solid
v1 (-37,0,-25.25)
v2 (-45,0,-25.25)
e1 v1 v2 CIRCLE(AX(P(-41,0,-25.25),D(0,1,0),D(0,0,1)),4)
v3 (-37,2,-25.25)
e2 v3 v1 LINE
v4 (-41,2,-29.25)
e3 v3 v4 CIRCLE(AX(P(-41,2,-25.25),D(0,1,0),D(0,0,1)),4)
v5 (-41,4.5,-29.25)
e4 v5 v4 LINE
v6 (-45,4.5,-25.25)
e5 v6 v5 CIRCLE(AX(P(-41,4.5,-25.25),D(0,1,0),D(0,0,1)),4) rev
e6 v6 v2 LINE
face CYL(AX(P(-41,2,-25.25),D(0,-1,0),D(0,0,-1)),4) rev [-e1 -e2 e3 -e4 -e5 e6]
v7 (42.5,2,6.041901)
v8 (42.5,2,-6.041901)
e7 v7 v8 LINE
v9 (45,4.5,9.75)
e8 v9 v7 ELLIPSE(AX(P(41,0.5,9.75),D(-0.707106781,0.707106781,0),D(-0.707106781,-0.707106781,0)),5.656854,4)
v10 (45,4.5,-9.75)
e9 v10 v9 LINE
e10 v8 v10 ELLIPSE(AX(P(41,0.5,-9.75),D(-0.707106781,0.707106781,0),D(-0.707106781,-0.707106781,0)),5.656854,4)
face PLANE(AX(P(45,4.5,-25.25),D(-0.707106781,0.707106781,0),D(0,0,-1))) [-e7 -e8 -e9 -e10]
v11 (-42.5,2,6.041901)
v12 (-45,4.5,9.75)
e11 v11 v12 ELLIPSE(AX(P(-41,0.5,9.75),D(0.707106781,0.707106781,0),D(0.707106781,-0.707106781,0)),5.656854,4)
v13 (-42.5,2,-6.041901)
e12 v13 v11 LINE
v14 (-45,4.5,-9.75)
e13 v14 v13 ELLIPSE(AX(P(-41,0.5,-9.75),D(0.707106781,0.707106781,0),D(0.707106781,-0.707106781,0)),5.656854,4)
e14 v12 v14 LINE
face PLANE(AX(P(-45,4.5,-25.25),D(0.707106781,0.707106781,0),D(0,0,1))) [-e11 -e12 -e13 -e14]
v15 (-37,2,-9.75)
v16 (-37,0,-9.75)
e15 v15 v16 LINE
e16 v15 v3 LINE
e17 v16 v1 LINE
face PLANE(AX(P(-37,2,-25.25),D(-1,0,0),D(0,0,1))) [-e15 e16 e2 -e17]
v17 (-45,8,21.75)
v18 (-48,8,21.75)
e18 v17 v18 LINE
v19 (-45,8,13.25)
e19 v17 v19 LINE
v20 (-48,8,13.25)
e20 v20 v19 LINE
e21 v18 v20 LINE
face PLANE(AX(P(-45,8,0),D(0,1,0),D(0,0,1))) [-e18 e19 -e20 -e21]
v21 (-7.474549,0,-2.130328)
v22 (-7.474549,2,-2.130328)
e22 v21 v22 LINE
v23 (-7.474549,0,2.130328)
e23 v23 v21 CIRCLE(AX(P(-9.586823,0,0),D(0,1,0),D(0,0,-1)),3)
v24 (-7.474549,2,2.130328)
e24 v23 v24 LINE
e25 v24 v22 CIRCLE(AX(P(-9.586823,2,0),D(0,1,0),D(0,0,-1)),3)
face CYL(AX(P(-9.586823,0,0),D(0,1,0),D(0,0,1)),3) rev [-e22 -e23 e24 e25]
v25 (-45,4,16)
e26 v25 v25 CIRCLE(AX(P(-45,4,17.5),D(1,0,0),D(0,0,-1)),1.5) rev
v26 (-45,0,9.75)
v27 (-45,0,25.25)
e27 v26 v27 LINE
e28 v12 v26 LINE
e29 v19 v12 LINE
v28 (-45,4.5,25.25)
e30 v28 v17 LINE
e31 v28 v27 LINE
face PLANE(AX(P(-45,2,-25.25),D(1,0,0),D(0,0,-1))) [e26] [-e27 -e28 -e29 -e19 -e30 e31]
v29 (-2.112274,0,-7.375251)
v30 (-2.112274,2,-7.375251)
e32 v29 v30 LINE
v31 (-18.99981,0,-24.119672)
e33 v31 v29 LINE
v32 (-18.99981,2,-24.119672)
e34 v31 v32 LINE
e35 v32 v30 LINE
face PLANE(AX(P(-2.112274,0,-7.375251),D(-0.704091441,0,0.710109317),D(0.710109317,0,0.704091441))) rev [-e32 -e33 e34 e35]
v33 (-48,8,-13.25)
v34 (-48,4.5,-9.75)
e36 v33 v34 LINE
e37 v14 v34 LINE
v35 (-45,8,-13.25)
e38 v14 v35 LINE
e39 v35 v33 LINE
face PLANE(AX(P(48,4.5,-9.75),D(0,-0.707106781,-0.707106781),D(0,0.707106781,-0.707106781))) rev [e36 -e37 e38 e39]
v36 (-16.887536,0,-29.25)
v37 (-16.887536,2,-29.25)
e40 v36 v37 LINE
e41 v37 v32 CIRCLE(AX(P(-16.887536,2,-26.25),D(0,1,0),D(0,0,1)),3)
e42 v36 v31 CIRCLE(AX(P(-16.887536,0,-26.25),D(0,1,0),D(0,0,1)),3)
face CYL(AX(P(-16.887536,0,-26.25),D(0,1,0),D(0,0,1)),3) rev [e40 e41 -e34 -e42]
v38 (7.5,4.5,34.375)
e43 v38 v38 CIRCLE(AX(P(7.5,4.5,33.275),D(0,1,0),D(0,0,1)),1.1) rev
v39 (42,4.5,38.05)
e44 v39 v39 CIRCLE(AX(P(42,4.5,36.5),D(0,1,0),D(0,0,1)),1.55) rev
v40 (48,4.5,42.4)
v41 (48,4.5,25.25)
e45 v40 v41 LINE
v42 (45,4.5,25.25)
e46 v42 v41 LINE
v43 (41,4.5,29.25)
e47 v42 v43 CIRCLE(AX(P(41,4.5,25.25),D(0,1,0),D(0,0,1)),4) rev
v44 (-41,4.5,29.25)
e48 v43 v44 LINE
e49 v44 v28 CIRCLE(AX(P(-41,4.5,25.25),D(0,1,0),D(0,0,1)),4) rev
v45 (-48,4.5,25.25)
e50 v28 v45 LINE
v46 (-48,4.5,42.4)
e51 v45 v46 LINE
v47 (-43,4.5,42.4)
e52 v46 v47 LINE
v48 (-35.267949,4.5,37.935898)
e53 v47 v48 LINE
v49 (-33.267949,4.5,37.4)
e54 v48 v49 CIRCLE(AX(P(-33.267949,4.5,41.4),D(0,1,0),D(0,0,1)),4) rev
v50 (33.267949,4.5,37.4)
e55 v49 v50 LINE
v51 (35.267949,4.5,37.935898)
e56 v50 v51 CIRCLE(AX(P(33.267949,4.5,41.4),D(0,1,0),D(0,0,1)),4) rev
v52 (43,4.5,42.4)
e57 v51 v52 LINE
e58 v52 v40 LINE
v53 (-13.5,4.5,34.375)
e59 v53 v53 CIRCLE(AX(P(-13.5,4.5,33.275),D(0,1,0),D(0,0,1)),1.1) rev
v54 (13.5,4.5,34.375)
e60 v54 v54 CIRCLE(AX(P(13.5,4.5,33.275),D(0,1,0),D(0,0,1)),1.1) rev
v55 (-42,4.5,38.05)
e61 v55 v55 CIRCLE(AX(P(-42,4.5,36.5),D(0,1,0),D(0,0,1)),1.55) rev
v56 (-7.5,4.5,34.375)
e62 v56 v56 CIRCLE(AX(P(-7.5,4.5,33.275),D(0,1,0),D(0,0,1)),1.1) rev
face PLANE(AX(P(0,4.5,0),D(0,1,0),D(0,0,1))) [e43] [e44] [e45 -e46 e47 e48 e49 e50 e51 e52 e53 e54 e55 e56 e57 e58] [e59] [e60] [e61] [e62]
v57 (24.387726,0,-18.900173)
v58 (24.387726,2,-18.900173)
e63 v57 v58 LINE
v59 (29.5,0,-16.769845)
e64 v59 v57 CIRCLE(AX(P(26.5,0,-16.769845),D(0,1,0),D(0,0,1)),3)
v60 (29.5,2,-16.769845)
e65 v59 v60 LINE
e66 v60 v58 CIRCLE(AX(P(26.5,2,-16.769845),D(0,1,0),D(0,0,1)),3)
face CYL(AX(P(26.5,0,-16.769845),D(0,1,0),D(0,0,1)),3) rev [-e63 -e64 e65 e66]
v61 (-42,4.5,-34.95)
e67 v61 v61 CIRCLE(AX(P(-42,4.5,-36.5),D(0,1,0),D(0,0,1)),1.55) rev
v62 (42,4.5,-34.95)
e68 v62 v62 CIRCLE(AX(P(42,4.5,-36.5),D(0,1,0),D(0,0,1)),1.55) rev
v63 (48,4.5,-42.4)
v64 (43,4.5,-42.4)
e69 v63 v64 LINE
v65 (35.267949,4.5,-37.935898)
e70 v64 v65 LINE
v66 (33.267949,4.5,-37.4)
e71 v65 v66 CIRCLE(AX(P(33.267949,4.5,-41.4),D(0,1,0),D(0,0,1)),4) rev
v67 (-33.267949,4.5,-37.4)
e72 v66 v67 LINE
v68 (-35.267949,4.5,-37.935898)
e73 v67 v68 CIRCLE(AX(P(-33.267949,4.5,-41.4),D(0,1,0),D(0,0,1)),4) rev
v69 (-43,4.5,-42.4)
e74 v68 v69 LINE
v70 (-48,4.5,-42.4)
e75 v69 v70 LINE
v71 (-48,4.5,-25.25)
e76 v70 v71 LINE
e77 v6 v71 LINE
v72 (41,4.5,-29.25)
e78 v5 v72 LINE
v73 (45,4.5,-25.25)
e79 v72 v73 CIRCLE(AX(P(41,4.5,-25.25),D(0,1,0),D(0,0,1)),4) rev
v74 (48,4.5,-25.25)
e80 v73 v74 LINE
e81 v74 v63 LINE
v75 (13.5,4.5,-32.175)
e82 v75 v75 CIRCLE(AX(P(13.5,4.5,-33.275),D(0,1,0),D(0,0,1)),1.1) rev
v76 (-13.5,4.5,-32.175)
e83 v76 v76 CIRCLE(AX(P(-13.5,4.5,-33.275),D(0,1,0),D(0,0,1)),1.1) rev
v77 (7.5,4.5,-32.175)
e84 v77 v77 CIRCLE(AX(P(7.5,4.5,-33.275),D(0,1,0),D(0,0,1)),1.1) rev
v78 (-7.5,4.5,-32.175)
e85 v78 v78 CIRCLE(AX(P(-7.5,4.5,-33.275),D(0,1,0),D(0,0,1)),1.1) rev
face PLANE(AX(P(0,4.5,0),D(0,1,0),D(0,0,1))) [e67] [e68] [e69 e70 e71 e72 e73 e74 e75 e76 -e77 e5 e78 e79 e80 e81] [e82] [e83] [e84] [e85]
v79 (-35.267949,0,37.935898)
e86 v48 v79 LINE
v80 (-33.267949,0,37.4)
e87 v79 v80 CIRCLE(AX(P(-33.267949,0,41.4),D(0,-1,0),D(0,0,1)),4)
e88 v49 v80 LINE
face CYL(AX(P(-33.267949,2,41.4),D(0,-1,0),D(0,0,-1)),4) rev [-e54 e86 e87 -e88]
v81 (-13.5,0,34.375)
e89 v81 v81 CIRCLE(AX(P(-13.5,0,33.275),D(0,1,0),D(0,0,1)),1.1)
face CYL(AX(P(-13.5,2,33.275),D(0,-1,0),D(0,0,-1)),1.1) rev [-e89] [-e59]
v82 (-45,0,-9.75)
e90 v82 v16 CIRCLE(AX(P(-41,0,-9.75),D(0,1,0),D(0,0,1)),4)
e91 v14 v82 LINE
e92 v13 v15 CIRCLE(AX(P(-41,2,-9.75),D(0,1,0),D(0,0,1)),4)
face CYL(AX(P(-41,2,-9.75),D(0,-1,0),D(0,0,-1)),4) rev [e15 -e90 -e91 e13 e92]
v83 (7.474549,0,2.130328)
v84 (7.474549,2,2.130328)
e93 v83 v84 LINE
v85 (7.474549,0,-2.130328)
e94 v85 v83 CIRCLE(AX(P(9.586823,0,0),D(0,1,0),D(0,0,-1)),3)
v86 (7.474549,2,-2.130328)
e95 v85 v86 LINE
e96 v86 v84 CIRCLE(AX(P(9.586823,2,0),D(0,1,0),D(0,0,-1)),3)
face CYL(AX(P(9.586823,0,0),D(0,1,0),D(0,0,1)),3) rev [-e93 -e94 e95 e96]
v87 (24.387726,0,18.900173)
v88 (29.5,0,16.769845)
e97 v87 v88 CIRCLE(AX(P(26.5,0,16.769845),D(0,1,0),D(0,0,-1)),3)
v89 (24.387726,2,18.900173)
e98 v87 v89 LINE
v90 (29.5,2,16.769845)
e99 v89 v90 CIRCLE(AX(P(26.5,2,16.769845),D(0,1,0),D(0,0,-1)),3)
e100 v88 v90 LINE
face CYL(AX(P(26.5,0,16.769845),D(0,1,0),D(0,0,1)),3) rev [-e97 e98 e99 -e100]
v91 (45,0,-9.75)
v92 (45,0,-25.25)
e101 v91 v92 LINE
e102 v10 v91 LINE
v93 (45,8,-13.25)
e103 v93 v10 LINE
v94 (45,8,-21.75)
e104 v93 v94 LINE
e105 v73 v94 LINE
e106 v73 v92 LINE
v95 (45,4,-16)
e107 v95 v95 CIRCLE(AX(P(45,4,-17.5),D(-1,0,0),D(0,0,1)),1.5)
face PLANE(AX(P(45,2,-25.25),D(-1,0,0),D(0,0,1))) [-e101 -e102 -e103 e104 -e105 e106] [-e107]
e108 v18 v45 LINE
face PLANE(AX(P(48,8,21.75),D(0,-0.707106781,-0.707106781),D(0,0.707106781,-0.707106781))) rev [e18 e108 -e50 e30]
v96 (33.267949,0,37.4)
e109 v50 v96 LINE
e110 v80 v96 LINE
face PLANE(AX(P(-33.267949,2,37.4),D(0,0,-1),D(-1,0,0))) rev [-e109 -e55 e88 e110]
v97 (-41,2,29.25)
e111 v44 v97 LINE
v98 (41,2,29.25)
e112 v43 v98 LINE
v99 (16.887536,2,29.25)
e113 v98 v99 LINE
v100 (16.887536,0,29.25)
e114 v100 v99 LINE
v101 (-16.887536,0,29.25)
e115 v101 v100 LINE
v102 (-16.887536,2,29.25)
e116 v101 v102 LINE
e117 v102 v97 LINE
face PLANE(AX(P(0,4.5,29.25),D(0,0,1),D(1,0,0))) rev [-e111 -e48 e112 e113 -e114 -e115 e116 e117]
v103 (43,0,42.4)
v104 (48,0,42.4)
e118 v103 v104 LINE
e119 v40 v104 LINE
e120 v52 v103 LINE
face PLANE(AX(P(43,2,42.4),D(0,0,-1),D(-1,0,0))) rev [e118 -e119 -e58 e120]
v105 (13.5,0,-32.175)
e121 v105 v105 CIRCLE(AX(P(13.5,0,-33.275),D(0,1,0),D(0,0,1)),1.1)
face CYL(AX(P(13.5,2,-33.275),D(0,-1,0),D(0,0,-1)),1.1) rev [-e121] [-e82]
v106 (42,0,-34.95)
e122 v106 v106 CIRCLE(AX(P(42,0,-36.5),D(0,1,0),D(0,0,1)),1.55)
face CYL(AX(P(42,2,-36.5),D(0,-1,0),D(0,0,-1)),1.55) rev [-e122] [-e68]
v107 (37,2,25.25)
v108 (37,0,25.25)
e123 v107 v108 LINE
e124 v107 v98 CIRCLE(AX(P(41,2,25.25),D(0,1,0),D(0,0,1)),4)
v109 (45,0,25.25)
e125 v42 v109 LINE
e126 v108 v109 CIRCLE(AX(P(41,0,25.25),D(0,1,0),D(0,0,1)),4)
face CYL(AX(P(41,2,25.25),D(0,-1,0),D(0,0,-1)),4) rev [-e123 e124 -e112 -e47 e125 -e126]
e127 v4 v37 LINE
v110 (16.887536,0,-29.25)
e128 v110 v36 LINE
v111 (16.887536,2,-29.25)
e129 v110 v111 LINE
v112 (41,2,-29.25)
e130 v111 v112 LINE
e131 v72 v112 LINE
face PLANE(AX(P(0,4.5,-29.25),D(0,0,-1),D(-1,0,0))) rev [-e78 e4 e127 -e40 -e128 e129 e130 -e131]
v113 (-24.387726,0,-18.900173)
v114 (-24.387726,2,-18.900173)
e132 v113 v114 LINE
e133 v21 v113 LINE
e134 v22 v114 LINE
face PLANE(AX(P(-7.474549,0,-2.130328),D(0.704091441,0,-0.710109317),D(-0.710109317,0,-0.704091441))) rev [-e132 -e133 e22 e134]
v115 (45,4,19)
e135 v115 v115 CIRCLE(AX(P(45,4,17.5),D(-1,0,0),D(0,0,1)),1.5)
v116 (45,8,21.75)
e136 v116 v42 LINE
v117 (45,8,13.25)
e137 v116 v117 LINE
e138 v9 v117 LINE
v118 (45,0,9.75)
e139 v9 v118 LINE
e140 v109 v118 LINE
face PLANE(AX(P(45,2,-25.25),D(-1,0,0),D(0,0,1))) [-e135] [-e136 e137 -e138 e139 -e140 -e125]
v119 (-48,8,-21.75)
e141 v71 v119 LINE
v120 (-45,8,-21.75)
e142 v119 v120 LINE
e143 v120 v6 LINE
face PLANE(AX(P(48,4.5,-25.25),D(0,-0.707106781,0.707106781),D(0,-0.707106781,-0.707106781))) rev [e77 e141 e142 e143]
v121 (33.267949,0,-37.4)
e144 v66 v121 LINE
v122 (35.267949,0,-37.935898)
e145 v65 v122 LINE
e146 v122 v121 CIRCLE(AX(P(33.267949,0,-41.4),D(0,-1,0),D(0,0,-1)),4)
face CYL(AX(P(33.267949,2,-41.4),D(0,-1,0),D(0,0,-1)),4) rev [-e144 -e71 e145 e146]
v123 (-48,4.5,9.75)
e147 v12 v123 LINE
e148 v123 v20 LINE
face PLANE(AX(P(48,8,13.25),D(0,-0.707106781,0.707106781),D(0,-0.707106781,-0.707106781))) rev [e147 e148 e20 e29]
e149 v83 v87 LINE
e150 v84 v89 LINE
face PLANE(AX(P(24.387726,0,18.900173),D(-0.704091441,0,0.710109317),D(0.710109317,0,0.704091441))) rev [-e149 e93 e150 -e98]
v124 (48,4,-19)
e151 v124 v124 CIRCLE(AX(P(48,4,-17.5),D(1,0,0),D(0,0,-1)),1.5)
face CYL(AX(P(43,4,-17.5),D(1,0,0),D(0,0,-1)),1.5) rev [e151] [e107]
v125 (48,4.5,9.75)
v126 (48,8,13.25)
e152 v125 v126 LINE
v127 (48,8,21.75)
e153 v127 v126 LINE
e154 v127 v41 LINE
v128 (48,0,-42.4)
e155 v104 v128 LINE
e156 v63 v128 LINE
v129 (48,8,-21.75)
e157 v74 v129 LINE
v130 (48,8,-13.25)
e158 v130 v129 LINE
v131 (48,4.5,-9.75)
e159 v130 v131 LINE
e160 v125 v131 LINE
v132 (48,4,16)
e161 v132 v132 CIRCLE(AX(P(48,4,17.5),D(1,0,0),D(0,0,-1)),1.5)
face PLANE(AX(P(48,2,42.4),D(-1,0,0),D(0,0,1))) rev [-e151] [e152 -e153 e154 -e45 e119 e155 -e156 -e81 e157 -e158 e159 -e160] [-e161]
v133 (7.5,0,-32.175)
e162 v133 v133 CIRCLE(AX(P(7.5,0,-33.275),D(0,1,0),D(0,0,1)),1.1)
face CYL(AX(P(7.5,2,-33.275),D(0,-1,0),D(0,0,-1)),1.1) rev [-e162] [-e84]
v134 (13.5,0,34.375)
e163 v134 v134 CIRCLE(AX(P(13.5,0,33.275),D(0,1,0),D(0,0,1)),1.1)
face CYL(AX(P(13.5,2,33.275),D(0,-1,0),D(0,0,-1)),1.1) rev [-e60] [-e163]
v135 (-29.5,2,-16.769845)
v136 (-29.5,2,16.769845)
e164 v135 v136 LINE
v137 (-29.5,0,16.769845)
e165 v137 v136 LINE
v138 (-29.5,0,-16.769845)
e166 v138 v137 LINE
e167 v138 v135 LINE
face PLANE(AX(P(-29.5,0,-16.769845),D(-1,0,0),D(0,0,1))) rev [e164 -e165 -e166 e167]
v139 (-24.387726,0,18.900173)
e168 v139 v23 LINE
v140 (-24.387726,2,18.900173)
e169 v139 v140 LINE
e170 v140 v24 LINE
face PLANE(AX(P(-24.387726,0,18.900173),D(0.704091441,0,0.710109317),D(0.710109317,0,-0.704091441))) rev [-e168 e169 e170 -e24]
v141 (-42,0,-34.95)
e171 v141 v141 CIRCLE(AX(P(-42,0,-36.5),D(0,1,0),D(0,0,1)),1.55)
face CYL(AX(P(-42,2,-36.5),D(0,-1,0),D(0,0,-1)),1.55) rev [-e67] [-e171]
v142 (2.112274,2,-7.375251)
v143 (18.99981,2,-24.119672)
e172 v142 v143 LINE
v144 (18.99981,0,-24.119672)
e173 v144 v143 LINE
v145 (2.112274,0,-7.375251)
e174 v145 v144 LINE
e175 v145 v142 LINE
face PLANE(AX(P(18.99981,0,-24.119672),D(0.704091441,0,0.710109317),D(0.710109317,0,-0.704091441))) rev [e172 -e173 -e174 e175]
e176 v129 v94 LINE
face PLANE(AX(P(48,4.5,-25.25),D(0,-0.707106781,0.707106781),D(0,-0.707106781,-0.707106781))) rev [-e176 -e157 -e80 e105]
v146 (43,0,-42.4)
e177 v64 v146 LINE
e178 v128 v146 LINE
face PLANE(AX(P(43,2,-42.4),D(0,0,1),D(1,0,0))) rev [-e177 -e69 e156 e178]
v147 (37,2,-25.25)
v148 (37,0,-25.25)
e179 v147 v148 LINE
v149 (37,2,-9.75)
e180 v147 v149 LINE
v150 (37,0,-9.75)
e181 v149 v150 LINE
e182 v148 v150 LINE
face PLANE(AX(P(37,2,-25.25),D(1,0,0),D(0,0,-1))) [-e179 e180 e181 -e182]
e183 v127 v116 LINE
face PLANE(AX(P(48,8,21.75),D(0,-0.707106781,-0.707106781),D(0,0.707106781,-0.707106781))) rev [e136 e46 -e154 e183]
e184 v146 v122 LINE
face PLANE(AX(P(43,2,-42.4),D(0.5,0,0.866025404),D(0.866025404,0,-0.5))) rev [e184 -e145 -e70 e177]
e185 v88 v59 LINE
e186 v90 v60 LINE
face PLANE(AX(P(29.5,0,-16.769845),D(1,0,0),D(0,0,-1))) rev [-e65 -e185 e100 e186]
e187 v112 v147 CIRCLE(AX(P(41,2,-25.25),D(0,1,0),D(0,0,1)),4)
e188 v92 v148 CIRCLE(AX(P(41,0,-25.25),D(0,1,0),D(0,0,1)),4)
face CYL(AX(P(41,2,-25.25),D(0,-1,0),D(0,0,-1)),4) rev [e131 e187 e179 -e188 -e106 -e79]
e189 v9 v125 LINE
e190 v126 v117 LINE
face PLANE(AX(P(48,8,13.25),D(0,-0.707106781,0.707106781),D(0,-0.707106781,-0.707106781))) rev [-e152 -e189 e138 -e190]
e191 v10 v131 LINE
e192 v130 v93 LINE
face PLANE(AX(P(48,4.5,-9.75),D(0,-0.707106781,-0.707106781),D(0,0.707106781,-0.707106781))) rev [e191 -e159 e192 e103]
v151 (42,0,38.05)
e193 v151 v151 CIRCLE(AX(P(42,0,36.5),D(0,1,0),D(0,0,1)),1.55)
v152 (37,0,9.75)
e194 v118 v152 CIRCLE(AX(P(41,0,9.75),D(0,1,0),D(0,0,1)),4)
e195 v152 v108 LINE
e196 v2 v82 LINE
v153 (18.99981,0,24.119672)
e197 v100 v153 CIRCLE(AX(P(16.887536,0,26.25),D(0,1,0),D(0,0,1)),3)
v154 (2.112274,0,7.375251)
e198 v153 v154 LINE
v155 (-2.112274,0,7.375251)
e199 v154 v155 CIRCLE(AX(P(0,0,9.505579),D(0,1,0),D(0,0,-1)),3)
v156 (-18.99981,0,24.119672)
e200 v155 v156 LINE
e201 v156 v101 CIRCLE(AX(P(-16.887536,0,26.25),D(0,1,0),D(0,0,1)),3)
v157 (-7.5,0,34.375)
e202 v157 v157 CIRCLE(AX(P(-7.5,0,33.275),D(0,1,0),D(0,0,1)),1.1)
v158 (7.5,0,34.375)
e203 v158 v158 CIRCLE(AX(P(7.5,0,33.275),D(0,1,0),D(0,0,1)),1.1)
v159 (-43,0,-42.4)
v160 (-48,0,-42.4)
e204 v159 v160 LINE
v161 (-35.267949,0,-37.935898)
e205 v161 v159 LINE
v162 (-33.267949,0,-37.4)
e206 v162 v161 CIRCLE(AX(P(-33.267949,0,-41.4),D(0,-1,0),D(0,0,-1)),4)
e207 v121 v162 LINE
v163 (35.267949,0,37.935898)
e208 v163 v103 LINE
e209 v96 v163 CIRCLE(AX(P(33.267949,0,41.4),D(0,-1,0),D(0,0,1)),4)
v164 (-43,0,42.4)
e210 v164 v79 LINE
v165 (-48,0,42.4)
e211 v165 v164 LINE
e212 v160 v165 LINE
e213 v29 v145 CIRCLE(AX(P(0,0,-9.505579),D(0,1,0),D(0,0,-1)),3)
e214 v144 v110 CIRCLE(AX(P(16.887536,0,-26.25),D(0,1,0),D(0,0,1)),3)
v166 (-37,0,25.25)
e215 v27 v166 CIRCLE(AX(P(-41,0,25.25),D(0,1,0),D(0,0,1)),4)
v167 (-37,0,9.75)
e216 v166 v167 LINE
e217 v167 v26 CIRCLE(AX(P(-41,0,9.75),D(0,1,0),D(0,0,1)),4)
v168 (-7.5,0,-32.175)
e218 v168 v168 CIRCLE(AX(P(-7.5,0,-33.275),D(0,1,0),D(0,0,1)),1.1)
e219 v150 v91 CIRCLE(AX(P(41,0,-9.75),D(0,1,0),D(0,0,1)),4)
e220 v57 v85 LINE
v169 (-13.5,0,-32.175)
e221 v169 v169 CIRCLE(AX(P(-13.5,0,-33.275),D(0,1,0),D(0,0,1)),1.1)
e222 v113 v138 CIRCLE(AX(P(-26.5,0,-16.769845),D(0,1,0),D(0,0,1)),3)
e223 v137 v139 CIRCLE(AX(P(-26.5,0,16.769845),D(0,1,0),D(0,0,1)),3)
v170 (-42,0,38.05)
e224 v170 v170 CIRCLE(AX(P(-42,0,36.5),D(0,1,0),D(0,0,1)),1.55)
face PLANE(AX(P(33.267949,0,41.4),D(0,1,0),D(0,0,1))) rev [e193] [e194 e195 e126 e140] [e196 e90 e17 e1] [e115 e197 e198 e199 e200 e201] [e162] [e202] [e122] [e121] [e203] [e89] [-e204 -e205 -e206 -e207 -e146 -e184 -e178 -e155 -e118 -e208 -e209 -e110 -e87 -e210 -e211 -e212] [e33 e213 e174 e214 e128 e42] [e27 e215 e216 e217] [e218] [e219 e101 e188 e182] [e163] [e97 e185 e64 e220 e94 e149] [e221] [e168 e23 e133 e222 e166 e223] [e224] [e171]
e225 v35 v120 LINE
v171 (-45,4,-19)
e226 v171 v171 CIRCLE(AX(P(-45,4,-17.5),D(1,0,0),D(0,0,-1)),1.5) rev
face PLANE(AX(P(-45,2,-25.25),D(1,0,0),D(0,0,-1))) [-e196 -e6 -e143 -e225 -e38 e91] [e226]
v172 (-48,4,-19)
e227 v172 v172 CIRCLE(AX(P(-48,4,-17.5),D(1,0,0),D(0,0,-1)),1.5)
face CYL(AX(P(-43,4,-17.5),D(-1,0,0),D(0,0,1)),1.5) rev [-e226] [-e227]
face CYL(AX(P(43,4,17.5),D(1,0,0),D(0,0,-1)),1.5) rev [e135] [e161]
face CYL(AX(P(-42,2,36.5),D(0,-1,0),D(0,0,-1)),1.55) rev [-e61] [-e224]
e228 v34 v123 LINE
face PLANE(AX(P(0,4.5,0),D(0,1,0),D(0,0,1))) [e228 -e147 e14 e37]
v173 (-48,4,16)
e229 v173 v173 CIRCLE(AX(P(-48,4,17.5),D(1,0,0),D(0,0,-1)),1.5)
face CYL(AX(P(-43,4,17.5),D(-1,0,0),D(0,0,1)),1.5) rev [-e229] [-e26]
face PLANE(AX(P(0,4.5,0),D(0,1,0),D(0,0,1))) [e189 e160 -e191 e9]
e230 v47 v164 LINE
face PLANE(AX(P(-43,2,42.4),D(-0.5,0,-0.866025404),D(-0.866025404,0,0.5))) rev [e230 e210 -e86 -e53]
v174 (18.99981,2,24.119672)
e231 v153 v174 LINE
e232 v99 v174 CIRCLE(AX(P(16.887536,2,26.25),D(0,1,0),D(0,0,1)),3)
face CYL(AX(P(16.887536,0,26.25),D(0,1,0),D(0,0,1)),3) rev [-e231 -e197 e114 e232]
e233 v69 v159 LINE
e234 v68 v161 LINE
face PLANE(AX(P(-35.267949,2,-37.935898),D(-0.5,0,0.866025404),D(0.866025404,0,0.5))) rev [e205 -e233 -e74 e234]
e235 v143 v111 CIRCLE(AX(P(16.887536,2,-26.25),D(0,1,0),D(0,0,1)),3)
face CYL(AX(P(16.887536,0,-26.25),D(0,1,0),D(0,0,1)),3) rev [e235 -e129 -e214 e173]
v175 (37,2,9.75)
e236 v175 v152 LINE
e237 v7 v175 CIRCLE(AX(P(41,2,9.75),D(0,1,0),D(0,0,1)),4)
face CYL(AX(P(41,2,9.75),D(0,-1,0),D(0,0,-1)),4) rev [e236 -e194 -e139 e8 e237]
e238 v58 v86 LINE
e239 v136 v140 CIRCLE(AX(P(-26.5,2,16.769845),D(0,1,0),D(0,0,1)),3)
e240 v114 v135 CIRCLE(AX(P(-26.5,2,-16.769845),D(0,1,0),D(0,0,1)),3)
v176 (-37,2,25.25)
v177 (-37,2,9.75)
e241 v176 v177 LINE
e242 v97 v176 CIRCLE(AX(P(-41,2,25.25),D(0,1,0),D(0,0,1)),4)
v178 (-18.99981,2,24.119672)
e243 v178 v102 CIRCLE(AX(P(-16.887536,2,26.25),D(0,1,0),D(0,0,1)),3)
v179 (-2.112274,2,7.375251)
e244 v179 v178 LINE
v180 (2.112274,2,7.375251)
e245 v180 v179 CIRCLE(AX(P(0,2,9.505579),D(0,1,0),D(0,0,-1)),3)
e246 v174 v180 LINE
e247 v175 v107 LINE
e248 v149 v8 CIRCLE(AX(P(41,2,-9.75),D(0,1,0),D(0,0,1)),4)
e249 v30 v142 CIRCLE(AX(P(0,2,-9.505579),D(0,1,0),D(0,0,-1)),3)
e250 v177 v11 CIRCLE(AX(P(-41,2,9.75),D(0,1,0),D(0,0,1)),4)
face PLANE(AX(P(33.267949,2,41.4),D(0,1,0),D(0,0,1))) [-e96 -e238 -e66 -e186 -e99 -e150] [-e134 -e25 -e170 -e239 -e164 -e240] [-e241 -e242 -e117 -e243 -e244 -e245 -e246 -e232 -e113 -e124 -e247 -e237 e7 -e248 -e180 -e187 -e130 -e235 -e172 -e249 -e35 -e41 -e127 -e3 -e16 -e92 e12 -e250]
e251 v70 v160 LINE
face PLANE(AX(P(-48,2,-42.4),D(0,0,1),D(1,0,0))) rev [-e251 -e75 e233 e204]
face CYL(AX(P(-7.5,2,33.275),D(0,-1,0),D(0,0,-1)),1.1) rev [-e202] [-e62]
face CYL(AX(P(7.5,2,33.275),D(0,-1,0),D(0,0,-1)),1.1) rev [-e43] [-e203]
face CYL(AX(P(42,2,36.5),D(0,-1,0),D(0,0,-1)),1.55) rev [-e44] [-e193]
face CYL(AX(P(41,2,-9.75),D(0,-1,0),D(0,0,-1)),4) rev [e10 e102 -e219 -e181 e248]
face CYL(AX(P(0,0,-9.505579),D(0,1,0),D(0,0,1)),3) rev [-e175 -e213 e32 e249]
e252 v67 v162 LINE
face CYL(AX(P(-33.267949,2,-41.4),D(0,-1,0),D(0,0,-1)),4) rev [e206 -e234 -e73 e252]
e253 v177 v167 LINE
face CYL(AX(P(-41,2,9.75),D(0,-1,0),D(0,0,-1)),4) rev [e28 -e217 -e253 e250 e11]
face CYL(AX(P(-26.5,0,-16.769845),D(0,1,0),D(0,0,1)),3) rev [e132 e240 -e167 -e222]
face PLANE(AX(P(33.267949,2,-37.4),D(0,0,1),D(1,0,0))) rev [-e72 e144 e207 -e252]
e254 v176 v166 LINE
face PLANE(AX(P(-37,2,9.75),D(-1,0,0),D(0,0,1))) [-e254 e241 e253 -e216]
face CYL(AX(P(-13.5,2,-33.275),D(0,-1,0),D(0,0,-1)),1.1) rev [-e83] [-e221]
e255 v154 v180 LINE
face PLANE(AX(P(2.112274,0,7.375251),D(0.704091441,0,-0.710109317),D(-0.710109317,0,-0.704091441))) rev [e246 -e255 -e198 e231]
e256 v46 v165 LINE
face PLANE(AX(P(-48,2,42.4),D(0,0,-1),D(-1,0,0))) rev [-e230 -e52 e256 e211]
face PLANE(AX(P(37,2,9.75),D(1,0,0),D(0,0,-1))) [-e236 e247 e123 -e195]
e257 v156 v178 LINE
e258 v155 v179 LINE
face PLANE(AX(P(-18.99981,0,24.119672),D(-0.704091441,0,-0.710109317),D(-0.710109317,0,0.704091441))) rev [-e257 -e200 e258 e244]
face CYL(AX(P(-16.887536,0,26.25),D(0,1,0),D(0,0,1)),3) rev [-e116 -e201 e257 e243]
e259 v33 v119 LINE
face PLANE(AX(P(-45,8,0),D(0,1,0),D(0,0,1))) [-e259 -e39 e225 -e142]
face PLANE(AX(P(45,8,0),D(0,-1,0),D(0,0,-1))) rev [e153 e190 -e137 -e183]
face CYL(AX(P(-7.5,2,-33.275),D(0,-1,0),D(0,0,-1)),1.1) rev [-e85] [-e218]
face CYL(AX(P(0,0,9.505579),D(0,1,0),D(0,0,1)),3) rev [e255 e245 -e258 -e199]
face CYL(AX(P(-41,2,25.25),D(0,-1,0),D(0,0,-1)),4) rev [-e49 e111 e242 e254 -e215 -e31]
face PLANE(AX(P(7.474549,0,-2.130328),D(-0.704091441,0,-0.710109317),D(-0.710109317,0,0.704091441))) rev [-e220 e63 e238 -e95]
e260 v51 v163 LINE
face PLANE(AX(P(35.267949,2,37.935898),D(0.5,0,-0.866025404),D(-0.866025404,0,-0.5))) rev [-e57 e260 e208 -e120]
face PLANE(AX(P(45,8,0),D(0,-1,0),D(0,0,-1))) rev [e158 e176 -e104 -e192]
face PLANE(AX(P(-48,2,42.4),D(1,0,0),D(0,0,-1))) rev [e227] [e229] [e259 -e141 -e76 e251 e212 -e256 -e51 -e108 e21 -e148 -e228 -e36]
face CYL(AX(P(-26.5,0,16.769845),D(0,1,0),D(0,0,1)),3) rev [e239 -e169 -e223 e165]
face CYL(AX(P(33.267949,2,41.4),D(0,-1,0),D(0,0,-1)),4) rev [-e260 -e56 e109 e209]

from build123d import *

# Parameters (mm, degrees)
SKETCH1_R           = 1.1
SKETCH1_R_2         = 1.55
BOSS_EXTRUDE1_DEPTH = 2
SKETCH2_R           = 1.55
SKETCH2_R_2         = 1.1
BOSS_EXTRUDE2_DEPTH = 2.5
BOSS_EXTRUDE3_START = -3
SKETCH3_W           = 15.5
SKETCH3_H           = 3.5
BOSS_EXTRUDE3_DEPTH = 3
SKETCH4_R           = 1.5
CUT_EXTRUDE1_DEPTH  = 5
CUT_EXTRUDE2_DEPTH  = 65.325422657
CUT_EXTRUDE3_DEPTH  = 106.250938238
CHAMFER1_SIZE       = 2.5


with BuildPart() as part:
    # Sketch1 → Boss-Extrude1 (new body)
    with BuildSketch(Plane(origin=(0, 0, 0), x_dir=(1, 0, 0), z_dir=(0, 1, 0))):
        with BuildLine():
            Line((-48, -42.4), (-43, -42.4))
            Line((-43, -42.4), (-35.267949192, -37.935898385))
            ThreePointArc((-35.267949192, -37.935898385), (-34.303225373, -37.536296695), (-33.267949192, -37.4))
            Line((-33.267949192, -37.4), (33.267949192, -37.4))
            ThreePointArc((33.267949192, -37.4), (34.303225373, -37.536296695), (35.267949192, -37.935898385))
            Line((35.267949192, -37.935898385), (43, -42.4))
            Line((43, -42.4), (48, -42.4))
            Line((48, -42.4), (48, 42.4))
            Line((48, 42.4), (43, 42.4))
            Line((43, 42.4), (35.267949192, 37.935898385))
            ThreePointArc((35.267949192, 37.935898385), (34.303225373, 37.536296695), (33.267949192, 37.4))
            Line((33.267949192, 37.4), (-33.267949192, 37.4))
            ThreePointArc((-33.267949192, 37.4), (-34.303225373, 37.536296695), (-35.267949192, 37.935898385))
            Line((-35.267949192, 37.935898385), (-43, 42.4))
            Line((-43, 42.4), (-48, 42.4))
            Line((-48, 42.4), (-48, -42.4))
        make_face()
        with Locations(Location((-13.5, -33.275, 0), (0, 0, 270))):
            Circle(SKETCH1_R, mode=Mode.SUBTRACT)
        with Locations(Location((-7.5, -33.275, 0), (0, 0, 270))):
            Circle(SKETCH1_R, mode=Mode.SUBTRACT)
        with Locations(Location((7.5, -33.275, 0), (0, 0, 270))):
            Circle(SKETCH1_R, mode=Mode.SUBTRACT)
        with Locations(Location((13.5, -33.275, 0), (0, 0, 270))):
            Circle(SKETCH1_R, mode=Mode.SUBTRACT)
        with Locations(Location((-13.5, 33.275, 0), (0, 0, 270))):
            Circle(SKETCH1_R, mode=Mode.SUBTRACT)
        with Locations(Location((-7.5, 33.275, 0), (0, 0, 270))):
            Circle(SKETCH1_R, mode=Mode.SUBTRACT)
        with Locations(Location((7.5, 33.275, 0), (0, 0, 270))):
            Circle(SKETCH1_R, mode=Mode.SUBTRACT)
        with Locations(Location((13.5, 33.275, 0), (0, 0, 270))):
            Circle(SKETCH1_R, mode=Mode.SUBTRACT)
        with Locations(Location((-42, 36.5, 0), (0, 0, 270))):
            Circle(SKETCH1_R_2, mode=Mode.SUBTRACT)
        with Locations(Location((42, 36.5, 0), (0, 0, 270))):
            Circle(SKETCH1_R_2, mode=Mode.SUBTRACT)
        with Locations(Location((42, -36.5, 0), (0, 0, 270))):
            Circle(SKETCH1_R_2, mode=Mode.SUBTRACT)
        with Locations(Location((-42, -36.5, 0), (0, 0, 270))):
            Circle(SKETCH1_R_2, mode=Mode.SUBTRACT)
        with BuildLine():
            Line((-37, 25.25), (-37, 9.75))
            ThreePointArc((-37, 9.75), (-41, 5.75), (-45, 9.75))
            Line((-45, 9.75), (-45, 25.25))
            ThreePointArc((-45, 25.25), (-41, 29.25), (-37, 25.25))
        make_face(mode=Mode.SUBTRACT)
        with BuildLine():
            Line((-37, -9.75), (-37, -25.25))
            ThreePointArc((-37, -25.25), (-41, -29.25), (-45, -25.25))
            Line((-45, -25.25), (-45, -9.75))
            ThreePointArc((-45, -9.75), (-41, -5.75), (-37, -9.75))
        make_face(mode=Mode.SUBTRACT)
        with BuildLine():
            Line((45, 25.25), (45, 9.75))
            ThreePointArc((45, 9.75), (41, 5.75), (37, 9.75))
            Line((37, 9.75), (37, 25.25))
            ThreePointArc((37, 25.25), (41, 29.25), (45, 25.25))
        make_face(mode=Mode.SUBTRACT)
        with BuildLine():
            Line((45, -9.75), (45, -25.25))
            ThreePointArc((45, -25.25), (41, -29.25), (37, -25.25))
            Line((37, -25.25), (37, -9.75))
            ThreePointArc((37, -9.75), (41, -5.75), (45, -9.75))
        make_face(mode=Mode.SUBTRACT)
    extrude(amount=BOSS_EXTRUDE1_DEPTH)

    # Sketch2 → Boss-Extrude2 (add)
    with BuildSketch(Plane(origin=(0, 2, 0), x_dir=(1, 0, 0), z_dir=(0, 1, 0))):
        with BuildLine():
            Line((48, -42.4), (48, 42.4))
            Line((48, 42.4), (43, 42.4))
            Line((43, 42.4), (35.267949192, 37.935898385))
            ThreePointArc((35.267949192, 37.935898385), (34.303225373, 37.536296695), (33.267949192, 37.4))
            Line((33.267949192, 37.4), (-33.267949192, 37.4))
            ThreePointArc((-33.267949192, 37.4), (-34.303225373, 37.536296695), (-35.267949192, 37.935898385))
            Line((-35.267949192, 37.935898385), (-43, 42.4))
            Line((-43, 42.4), (-48, 42.4))
            Line((-48, 42.4), (-48, -42.4))
            Line((-48, -42.4), (-43, -42.4))
            Line((-43, -42.4), (-35.267949192, -37.935898385))
            ThreePointArc((-35.267949192, -37.935898385), (-34.303225373, -37.536296695), (-33.267949192, -37.4))
            Line((-33.267949192, -37.4), (33.267949192, -37.4))
            ThreePointArc((33.267949192, -37.4), (34.303225373, -37.536296695), (35.267949192, -37.935898385))
            Line((35.267949192, -37.935898385), (43, -42.4))
            Line((43, -42.4), (48, -42.4))
        make_face()
        with Locations((-42, -36.5)):
            Circle(SKETCH2_R, mode=Mode.SUBTRACT)
        with Locations((-13.5, -33.275)):
            Circle(SKETCH2_R_2, mode=Mode.SUBTRACT)
        with Locations((-7.5, -33.275)):
            Circle(SKETCH2_R_2, mode=Mode.SUBTRACT)
        with Locations((7.5, -33.275)):
            Circle(SKETCH2_R_2, mode=Mode.SUBTRACT)
        with Locations((13.5, -33.275)):
            Circle(SKETCH2_R_2, mode=Mode.SUBTRACT)
        with Locations((42, -36.5)):
            Circle(SKETCH2_R, mode=Mode.SUBTRACT)
        with Locations((-42, 36.5)):
            Circle(SKETCH2_R, mode=Mode.SUBTRACT)
        with Locations((-13.5, 33.275)):
            Circle(SKETCH2_R_2, mode=Mode.SUBTRACT)
        with Locations((-7.5, 33.275)):
            Circle(SKETCH2_R_2, mode=Mode.SUBTRACT)
        with BuildLine():
            Line((45, 9.75), (45, -9.75))
            Line((45, -9.75), (45, -25.25))
            ThreePointArc((45, -25.25), (43.828427125, -28.078427125), (41, -29.25))
            Line((41, -29.25), (-41, -29.25))
            ThreePointArc((-41, -29.25), (-43.828427125, -28.078427125), (-45, -25.25))
            Line((-45, -25.25), (-45, -9.75))
            Line((-45, -9.75), (-45, 9.75))
            Line((-45, 9.75), (-45, 25.25))
            ThreePointArc((-45, 25.25), (-43.828427125, 28.078427125), (-41, 29.25))
            Line((-41, 29.25), (41, 29.25))
            ThreePointArc((41, 29.25), (43.828427125, 28.078427125), (45, 25.25))
            Line((45, 25.25), (45, 9.75))
        make_face(mode=Mode.SUBTRACT)
        with Locations((7.5, 33.275)):
            Circle(SKETCH2_R_2, mode=Mode.SUBTRACT)
        with Locations((13.5, 33.275)):
            Circle(SKETCH2_R_2, mode=Mode.SUBTRACT)
        with Locations((42, 36.5)):
            Circle(SKETCH2_R, mode=Mode.SUBTRACT)
    extrude(amount=BOSS_EXTRUDE2_DEPTH)

    # Sketch3 → Boss-Extrude3 (add)
    with BuildSketch(Plane(origin=(48, 0, 0), x_dir=(0, 0, -1), z_dir=(1, 0, 0)).offset(BOSS_EXTRUDE3_START)):
        with Locations((-17.5, 6.25)):
            Rectangle(SKETCH3_W, SKETCH3_H)
        with Locations((17.5, 6.25)):
            Rectangle(SKETCH3_W, SKETCH3_H)
    boss_extrude3 = extrude(amount=BOSS_EXTRUDE3_DEPTH)

    # Sketch4 → Cut-Extrude1 (cut)
    with BuildSketch(Plane(origin=(48, 0, 0), x_dir=(0, 0, -1), z_dir=(1, 0, 0))):
        with Locations((-17.5, 4)):
            Circle(SKETCH4_R)
        with Locations((17.5, 4)):
            Circle(SKETCH4_R)
    cut_extrude1 = extrude(amount=-CUT_EXTRUDE1_DEPTH, mode=Mode.SUBTRACT)

    # Mirror1: Boss-Extrude3, Cut-Extrude1 across plane
    add(boss_extrude3.mirror(Plane(origin=(0, 0, 0), x_dir=(0, 0, 1), z_dir=(1, 0, 0))))
    add(cut_extrude1.mirror(Plane(origin=(0, 0, 0), x_dir=(0, 0, 1), z_dir=(1, 0, 0))), mode=Mode.SUBTRACT)

    # Sketch5 → Cut-Extrude2 (cut, through all)
    with BuildSketch(Plane(origin=(0, 2, 0), x_dir=(1, 0, 0), z_dir=(0, 1, 0))):
        with BuildLine():
            Line((-24.387725676, -18.900172978), (-7.47454864, -2.130327951))
            ThreePointArc((-7.47454864, -2.130327951), (-6.586822965, 0), (-7.47454864, 2.130327951))
            Line((-7.47454864, 2.130327951), (-24.387725676, 18.900172978))
            ThreePointArc((-24.387725676, 18.900172978), (-27.653944762, 19.539034707), (-29.5, 16.769845027))
            Line((-29.5, 16.769845027), (-29.5, -16.769845027))
            ThreePointArc((-29.5, -16.769845027), (-27.653944762, -19.539034707), (-24.387725676, -18.900172978))
        make_face()
        with BuildLine():
            Line((18.999810334, 24.119672049), (2.112274324, 7.375250751))
            ThreePointArc((2.112274324, 7.375250751), (0, 6.505578702), (-2.112274324, 7.375250751))
            Line((-2.112274324, 7.375250751), (-18.999810334, 24.119672049))
            ThreePointArc((-18.999810334, 24.119672049), (-19.661610977, 27.392150635), (-16.88753601, 29.25))
            Line((-16.88753601, 29.25), (16.88753601, 29.25))
            ThreePointArc((16.88753601, 29.25), (19.661610977, 27.392150635), (18.999810334, 24.119672049))
        make_face()
        with BuildLine():
            Line((-18.999810334, -24.119672049), (-2.112274324, -7.375250751))
            ThreePointArc((-2.112274324, -7.375250751), (0, -6.505578702), (2.112274324, -7.375250751))
            Line((2.112274324, -7.375250751), (18.999810334, -24.119672049))
            ThreePointArc((18.999810334, -24.119672049), (19.661610977, -27.392150635), (16.88753601, -29.25))
            Line((16.88753601, -29.25), (-16.88753601, -29.25))
            ThreePointArc((-16.88753601, -29.25), (-19.661610977, -27.392150635), (-18.999810334, -24.119672049))
        make_face()
        with BuildLine():
            Line((7.47454864, 2.130327951), (24.387725676, 18.900172978))
            ThreePointArc((24.387725676, 18.900172978), (27.653944762, 19.539034707), (29.5, 16.769845027))
            Line((29.5, 16.769845027), (29.5, -16.769845027))
            ThreePointArc((29.5, -16.769845027), (27.653944762, -19.539034707), (24.387725676, -18.900172978))
            Line((24.387725676, -18.900172978), (7.47454864, -2.130327951))
            ThreePointArc((7.47454864, -2.130327951), (6.586822965, 0), (7.47454864, 2.130327951))
        make_face()
    extrude(amount=-CUT_EXTRUDE2_DEPTH, mode=Mode.SUBTRACT)

    # Sketch6 → Cut-Extrude3 (cut, through all)
    with BuildSketch(Plane.ZY.offset(48)):
        Polygon((-25.25, 4.5), (-21.75, 8), (-25.25, 8), align=None)
        Polygon((-9.75, 4.5), (-13.25, 8), (-9.75, 8), align=None)
        Polygon((9.75, 4.5), (9.75, 8), (13.25, 8), align=None)
        Polygon((25.25, 4.5), (25.25, 8), (21.75, 8), align=None)
    extrude(amount=-CUT_EXTRUDE3_DEPTH, mode=Mode.SUBTRACT)

    # Chamfer1
    chamfer1_edges = [part.edges().sort_by_distance(p)[0] for p in [
        (45, 2, 0),
        (-45, 2, 0),
    ]]
    chamfer(chamfer1_edges, length=CHAMFER1_SIZE - 0.0001)  # a hair under: the kernel refuses the full size


solid = part.part
